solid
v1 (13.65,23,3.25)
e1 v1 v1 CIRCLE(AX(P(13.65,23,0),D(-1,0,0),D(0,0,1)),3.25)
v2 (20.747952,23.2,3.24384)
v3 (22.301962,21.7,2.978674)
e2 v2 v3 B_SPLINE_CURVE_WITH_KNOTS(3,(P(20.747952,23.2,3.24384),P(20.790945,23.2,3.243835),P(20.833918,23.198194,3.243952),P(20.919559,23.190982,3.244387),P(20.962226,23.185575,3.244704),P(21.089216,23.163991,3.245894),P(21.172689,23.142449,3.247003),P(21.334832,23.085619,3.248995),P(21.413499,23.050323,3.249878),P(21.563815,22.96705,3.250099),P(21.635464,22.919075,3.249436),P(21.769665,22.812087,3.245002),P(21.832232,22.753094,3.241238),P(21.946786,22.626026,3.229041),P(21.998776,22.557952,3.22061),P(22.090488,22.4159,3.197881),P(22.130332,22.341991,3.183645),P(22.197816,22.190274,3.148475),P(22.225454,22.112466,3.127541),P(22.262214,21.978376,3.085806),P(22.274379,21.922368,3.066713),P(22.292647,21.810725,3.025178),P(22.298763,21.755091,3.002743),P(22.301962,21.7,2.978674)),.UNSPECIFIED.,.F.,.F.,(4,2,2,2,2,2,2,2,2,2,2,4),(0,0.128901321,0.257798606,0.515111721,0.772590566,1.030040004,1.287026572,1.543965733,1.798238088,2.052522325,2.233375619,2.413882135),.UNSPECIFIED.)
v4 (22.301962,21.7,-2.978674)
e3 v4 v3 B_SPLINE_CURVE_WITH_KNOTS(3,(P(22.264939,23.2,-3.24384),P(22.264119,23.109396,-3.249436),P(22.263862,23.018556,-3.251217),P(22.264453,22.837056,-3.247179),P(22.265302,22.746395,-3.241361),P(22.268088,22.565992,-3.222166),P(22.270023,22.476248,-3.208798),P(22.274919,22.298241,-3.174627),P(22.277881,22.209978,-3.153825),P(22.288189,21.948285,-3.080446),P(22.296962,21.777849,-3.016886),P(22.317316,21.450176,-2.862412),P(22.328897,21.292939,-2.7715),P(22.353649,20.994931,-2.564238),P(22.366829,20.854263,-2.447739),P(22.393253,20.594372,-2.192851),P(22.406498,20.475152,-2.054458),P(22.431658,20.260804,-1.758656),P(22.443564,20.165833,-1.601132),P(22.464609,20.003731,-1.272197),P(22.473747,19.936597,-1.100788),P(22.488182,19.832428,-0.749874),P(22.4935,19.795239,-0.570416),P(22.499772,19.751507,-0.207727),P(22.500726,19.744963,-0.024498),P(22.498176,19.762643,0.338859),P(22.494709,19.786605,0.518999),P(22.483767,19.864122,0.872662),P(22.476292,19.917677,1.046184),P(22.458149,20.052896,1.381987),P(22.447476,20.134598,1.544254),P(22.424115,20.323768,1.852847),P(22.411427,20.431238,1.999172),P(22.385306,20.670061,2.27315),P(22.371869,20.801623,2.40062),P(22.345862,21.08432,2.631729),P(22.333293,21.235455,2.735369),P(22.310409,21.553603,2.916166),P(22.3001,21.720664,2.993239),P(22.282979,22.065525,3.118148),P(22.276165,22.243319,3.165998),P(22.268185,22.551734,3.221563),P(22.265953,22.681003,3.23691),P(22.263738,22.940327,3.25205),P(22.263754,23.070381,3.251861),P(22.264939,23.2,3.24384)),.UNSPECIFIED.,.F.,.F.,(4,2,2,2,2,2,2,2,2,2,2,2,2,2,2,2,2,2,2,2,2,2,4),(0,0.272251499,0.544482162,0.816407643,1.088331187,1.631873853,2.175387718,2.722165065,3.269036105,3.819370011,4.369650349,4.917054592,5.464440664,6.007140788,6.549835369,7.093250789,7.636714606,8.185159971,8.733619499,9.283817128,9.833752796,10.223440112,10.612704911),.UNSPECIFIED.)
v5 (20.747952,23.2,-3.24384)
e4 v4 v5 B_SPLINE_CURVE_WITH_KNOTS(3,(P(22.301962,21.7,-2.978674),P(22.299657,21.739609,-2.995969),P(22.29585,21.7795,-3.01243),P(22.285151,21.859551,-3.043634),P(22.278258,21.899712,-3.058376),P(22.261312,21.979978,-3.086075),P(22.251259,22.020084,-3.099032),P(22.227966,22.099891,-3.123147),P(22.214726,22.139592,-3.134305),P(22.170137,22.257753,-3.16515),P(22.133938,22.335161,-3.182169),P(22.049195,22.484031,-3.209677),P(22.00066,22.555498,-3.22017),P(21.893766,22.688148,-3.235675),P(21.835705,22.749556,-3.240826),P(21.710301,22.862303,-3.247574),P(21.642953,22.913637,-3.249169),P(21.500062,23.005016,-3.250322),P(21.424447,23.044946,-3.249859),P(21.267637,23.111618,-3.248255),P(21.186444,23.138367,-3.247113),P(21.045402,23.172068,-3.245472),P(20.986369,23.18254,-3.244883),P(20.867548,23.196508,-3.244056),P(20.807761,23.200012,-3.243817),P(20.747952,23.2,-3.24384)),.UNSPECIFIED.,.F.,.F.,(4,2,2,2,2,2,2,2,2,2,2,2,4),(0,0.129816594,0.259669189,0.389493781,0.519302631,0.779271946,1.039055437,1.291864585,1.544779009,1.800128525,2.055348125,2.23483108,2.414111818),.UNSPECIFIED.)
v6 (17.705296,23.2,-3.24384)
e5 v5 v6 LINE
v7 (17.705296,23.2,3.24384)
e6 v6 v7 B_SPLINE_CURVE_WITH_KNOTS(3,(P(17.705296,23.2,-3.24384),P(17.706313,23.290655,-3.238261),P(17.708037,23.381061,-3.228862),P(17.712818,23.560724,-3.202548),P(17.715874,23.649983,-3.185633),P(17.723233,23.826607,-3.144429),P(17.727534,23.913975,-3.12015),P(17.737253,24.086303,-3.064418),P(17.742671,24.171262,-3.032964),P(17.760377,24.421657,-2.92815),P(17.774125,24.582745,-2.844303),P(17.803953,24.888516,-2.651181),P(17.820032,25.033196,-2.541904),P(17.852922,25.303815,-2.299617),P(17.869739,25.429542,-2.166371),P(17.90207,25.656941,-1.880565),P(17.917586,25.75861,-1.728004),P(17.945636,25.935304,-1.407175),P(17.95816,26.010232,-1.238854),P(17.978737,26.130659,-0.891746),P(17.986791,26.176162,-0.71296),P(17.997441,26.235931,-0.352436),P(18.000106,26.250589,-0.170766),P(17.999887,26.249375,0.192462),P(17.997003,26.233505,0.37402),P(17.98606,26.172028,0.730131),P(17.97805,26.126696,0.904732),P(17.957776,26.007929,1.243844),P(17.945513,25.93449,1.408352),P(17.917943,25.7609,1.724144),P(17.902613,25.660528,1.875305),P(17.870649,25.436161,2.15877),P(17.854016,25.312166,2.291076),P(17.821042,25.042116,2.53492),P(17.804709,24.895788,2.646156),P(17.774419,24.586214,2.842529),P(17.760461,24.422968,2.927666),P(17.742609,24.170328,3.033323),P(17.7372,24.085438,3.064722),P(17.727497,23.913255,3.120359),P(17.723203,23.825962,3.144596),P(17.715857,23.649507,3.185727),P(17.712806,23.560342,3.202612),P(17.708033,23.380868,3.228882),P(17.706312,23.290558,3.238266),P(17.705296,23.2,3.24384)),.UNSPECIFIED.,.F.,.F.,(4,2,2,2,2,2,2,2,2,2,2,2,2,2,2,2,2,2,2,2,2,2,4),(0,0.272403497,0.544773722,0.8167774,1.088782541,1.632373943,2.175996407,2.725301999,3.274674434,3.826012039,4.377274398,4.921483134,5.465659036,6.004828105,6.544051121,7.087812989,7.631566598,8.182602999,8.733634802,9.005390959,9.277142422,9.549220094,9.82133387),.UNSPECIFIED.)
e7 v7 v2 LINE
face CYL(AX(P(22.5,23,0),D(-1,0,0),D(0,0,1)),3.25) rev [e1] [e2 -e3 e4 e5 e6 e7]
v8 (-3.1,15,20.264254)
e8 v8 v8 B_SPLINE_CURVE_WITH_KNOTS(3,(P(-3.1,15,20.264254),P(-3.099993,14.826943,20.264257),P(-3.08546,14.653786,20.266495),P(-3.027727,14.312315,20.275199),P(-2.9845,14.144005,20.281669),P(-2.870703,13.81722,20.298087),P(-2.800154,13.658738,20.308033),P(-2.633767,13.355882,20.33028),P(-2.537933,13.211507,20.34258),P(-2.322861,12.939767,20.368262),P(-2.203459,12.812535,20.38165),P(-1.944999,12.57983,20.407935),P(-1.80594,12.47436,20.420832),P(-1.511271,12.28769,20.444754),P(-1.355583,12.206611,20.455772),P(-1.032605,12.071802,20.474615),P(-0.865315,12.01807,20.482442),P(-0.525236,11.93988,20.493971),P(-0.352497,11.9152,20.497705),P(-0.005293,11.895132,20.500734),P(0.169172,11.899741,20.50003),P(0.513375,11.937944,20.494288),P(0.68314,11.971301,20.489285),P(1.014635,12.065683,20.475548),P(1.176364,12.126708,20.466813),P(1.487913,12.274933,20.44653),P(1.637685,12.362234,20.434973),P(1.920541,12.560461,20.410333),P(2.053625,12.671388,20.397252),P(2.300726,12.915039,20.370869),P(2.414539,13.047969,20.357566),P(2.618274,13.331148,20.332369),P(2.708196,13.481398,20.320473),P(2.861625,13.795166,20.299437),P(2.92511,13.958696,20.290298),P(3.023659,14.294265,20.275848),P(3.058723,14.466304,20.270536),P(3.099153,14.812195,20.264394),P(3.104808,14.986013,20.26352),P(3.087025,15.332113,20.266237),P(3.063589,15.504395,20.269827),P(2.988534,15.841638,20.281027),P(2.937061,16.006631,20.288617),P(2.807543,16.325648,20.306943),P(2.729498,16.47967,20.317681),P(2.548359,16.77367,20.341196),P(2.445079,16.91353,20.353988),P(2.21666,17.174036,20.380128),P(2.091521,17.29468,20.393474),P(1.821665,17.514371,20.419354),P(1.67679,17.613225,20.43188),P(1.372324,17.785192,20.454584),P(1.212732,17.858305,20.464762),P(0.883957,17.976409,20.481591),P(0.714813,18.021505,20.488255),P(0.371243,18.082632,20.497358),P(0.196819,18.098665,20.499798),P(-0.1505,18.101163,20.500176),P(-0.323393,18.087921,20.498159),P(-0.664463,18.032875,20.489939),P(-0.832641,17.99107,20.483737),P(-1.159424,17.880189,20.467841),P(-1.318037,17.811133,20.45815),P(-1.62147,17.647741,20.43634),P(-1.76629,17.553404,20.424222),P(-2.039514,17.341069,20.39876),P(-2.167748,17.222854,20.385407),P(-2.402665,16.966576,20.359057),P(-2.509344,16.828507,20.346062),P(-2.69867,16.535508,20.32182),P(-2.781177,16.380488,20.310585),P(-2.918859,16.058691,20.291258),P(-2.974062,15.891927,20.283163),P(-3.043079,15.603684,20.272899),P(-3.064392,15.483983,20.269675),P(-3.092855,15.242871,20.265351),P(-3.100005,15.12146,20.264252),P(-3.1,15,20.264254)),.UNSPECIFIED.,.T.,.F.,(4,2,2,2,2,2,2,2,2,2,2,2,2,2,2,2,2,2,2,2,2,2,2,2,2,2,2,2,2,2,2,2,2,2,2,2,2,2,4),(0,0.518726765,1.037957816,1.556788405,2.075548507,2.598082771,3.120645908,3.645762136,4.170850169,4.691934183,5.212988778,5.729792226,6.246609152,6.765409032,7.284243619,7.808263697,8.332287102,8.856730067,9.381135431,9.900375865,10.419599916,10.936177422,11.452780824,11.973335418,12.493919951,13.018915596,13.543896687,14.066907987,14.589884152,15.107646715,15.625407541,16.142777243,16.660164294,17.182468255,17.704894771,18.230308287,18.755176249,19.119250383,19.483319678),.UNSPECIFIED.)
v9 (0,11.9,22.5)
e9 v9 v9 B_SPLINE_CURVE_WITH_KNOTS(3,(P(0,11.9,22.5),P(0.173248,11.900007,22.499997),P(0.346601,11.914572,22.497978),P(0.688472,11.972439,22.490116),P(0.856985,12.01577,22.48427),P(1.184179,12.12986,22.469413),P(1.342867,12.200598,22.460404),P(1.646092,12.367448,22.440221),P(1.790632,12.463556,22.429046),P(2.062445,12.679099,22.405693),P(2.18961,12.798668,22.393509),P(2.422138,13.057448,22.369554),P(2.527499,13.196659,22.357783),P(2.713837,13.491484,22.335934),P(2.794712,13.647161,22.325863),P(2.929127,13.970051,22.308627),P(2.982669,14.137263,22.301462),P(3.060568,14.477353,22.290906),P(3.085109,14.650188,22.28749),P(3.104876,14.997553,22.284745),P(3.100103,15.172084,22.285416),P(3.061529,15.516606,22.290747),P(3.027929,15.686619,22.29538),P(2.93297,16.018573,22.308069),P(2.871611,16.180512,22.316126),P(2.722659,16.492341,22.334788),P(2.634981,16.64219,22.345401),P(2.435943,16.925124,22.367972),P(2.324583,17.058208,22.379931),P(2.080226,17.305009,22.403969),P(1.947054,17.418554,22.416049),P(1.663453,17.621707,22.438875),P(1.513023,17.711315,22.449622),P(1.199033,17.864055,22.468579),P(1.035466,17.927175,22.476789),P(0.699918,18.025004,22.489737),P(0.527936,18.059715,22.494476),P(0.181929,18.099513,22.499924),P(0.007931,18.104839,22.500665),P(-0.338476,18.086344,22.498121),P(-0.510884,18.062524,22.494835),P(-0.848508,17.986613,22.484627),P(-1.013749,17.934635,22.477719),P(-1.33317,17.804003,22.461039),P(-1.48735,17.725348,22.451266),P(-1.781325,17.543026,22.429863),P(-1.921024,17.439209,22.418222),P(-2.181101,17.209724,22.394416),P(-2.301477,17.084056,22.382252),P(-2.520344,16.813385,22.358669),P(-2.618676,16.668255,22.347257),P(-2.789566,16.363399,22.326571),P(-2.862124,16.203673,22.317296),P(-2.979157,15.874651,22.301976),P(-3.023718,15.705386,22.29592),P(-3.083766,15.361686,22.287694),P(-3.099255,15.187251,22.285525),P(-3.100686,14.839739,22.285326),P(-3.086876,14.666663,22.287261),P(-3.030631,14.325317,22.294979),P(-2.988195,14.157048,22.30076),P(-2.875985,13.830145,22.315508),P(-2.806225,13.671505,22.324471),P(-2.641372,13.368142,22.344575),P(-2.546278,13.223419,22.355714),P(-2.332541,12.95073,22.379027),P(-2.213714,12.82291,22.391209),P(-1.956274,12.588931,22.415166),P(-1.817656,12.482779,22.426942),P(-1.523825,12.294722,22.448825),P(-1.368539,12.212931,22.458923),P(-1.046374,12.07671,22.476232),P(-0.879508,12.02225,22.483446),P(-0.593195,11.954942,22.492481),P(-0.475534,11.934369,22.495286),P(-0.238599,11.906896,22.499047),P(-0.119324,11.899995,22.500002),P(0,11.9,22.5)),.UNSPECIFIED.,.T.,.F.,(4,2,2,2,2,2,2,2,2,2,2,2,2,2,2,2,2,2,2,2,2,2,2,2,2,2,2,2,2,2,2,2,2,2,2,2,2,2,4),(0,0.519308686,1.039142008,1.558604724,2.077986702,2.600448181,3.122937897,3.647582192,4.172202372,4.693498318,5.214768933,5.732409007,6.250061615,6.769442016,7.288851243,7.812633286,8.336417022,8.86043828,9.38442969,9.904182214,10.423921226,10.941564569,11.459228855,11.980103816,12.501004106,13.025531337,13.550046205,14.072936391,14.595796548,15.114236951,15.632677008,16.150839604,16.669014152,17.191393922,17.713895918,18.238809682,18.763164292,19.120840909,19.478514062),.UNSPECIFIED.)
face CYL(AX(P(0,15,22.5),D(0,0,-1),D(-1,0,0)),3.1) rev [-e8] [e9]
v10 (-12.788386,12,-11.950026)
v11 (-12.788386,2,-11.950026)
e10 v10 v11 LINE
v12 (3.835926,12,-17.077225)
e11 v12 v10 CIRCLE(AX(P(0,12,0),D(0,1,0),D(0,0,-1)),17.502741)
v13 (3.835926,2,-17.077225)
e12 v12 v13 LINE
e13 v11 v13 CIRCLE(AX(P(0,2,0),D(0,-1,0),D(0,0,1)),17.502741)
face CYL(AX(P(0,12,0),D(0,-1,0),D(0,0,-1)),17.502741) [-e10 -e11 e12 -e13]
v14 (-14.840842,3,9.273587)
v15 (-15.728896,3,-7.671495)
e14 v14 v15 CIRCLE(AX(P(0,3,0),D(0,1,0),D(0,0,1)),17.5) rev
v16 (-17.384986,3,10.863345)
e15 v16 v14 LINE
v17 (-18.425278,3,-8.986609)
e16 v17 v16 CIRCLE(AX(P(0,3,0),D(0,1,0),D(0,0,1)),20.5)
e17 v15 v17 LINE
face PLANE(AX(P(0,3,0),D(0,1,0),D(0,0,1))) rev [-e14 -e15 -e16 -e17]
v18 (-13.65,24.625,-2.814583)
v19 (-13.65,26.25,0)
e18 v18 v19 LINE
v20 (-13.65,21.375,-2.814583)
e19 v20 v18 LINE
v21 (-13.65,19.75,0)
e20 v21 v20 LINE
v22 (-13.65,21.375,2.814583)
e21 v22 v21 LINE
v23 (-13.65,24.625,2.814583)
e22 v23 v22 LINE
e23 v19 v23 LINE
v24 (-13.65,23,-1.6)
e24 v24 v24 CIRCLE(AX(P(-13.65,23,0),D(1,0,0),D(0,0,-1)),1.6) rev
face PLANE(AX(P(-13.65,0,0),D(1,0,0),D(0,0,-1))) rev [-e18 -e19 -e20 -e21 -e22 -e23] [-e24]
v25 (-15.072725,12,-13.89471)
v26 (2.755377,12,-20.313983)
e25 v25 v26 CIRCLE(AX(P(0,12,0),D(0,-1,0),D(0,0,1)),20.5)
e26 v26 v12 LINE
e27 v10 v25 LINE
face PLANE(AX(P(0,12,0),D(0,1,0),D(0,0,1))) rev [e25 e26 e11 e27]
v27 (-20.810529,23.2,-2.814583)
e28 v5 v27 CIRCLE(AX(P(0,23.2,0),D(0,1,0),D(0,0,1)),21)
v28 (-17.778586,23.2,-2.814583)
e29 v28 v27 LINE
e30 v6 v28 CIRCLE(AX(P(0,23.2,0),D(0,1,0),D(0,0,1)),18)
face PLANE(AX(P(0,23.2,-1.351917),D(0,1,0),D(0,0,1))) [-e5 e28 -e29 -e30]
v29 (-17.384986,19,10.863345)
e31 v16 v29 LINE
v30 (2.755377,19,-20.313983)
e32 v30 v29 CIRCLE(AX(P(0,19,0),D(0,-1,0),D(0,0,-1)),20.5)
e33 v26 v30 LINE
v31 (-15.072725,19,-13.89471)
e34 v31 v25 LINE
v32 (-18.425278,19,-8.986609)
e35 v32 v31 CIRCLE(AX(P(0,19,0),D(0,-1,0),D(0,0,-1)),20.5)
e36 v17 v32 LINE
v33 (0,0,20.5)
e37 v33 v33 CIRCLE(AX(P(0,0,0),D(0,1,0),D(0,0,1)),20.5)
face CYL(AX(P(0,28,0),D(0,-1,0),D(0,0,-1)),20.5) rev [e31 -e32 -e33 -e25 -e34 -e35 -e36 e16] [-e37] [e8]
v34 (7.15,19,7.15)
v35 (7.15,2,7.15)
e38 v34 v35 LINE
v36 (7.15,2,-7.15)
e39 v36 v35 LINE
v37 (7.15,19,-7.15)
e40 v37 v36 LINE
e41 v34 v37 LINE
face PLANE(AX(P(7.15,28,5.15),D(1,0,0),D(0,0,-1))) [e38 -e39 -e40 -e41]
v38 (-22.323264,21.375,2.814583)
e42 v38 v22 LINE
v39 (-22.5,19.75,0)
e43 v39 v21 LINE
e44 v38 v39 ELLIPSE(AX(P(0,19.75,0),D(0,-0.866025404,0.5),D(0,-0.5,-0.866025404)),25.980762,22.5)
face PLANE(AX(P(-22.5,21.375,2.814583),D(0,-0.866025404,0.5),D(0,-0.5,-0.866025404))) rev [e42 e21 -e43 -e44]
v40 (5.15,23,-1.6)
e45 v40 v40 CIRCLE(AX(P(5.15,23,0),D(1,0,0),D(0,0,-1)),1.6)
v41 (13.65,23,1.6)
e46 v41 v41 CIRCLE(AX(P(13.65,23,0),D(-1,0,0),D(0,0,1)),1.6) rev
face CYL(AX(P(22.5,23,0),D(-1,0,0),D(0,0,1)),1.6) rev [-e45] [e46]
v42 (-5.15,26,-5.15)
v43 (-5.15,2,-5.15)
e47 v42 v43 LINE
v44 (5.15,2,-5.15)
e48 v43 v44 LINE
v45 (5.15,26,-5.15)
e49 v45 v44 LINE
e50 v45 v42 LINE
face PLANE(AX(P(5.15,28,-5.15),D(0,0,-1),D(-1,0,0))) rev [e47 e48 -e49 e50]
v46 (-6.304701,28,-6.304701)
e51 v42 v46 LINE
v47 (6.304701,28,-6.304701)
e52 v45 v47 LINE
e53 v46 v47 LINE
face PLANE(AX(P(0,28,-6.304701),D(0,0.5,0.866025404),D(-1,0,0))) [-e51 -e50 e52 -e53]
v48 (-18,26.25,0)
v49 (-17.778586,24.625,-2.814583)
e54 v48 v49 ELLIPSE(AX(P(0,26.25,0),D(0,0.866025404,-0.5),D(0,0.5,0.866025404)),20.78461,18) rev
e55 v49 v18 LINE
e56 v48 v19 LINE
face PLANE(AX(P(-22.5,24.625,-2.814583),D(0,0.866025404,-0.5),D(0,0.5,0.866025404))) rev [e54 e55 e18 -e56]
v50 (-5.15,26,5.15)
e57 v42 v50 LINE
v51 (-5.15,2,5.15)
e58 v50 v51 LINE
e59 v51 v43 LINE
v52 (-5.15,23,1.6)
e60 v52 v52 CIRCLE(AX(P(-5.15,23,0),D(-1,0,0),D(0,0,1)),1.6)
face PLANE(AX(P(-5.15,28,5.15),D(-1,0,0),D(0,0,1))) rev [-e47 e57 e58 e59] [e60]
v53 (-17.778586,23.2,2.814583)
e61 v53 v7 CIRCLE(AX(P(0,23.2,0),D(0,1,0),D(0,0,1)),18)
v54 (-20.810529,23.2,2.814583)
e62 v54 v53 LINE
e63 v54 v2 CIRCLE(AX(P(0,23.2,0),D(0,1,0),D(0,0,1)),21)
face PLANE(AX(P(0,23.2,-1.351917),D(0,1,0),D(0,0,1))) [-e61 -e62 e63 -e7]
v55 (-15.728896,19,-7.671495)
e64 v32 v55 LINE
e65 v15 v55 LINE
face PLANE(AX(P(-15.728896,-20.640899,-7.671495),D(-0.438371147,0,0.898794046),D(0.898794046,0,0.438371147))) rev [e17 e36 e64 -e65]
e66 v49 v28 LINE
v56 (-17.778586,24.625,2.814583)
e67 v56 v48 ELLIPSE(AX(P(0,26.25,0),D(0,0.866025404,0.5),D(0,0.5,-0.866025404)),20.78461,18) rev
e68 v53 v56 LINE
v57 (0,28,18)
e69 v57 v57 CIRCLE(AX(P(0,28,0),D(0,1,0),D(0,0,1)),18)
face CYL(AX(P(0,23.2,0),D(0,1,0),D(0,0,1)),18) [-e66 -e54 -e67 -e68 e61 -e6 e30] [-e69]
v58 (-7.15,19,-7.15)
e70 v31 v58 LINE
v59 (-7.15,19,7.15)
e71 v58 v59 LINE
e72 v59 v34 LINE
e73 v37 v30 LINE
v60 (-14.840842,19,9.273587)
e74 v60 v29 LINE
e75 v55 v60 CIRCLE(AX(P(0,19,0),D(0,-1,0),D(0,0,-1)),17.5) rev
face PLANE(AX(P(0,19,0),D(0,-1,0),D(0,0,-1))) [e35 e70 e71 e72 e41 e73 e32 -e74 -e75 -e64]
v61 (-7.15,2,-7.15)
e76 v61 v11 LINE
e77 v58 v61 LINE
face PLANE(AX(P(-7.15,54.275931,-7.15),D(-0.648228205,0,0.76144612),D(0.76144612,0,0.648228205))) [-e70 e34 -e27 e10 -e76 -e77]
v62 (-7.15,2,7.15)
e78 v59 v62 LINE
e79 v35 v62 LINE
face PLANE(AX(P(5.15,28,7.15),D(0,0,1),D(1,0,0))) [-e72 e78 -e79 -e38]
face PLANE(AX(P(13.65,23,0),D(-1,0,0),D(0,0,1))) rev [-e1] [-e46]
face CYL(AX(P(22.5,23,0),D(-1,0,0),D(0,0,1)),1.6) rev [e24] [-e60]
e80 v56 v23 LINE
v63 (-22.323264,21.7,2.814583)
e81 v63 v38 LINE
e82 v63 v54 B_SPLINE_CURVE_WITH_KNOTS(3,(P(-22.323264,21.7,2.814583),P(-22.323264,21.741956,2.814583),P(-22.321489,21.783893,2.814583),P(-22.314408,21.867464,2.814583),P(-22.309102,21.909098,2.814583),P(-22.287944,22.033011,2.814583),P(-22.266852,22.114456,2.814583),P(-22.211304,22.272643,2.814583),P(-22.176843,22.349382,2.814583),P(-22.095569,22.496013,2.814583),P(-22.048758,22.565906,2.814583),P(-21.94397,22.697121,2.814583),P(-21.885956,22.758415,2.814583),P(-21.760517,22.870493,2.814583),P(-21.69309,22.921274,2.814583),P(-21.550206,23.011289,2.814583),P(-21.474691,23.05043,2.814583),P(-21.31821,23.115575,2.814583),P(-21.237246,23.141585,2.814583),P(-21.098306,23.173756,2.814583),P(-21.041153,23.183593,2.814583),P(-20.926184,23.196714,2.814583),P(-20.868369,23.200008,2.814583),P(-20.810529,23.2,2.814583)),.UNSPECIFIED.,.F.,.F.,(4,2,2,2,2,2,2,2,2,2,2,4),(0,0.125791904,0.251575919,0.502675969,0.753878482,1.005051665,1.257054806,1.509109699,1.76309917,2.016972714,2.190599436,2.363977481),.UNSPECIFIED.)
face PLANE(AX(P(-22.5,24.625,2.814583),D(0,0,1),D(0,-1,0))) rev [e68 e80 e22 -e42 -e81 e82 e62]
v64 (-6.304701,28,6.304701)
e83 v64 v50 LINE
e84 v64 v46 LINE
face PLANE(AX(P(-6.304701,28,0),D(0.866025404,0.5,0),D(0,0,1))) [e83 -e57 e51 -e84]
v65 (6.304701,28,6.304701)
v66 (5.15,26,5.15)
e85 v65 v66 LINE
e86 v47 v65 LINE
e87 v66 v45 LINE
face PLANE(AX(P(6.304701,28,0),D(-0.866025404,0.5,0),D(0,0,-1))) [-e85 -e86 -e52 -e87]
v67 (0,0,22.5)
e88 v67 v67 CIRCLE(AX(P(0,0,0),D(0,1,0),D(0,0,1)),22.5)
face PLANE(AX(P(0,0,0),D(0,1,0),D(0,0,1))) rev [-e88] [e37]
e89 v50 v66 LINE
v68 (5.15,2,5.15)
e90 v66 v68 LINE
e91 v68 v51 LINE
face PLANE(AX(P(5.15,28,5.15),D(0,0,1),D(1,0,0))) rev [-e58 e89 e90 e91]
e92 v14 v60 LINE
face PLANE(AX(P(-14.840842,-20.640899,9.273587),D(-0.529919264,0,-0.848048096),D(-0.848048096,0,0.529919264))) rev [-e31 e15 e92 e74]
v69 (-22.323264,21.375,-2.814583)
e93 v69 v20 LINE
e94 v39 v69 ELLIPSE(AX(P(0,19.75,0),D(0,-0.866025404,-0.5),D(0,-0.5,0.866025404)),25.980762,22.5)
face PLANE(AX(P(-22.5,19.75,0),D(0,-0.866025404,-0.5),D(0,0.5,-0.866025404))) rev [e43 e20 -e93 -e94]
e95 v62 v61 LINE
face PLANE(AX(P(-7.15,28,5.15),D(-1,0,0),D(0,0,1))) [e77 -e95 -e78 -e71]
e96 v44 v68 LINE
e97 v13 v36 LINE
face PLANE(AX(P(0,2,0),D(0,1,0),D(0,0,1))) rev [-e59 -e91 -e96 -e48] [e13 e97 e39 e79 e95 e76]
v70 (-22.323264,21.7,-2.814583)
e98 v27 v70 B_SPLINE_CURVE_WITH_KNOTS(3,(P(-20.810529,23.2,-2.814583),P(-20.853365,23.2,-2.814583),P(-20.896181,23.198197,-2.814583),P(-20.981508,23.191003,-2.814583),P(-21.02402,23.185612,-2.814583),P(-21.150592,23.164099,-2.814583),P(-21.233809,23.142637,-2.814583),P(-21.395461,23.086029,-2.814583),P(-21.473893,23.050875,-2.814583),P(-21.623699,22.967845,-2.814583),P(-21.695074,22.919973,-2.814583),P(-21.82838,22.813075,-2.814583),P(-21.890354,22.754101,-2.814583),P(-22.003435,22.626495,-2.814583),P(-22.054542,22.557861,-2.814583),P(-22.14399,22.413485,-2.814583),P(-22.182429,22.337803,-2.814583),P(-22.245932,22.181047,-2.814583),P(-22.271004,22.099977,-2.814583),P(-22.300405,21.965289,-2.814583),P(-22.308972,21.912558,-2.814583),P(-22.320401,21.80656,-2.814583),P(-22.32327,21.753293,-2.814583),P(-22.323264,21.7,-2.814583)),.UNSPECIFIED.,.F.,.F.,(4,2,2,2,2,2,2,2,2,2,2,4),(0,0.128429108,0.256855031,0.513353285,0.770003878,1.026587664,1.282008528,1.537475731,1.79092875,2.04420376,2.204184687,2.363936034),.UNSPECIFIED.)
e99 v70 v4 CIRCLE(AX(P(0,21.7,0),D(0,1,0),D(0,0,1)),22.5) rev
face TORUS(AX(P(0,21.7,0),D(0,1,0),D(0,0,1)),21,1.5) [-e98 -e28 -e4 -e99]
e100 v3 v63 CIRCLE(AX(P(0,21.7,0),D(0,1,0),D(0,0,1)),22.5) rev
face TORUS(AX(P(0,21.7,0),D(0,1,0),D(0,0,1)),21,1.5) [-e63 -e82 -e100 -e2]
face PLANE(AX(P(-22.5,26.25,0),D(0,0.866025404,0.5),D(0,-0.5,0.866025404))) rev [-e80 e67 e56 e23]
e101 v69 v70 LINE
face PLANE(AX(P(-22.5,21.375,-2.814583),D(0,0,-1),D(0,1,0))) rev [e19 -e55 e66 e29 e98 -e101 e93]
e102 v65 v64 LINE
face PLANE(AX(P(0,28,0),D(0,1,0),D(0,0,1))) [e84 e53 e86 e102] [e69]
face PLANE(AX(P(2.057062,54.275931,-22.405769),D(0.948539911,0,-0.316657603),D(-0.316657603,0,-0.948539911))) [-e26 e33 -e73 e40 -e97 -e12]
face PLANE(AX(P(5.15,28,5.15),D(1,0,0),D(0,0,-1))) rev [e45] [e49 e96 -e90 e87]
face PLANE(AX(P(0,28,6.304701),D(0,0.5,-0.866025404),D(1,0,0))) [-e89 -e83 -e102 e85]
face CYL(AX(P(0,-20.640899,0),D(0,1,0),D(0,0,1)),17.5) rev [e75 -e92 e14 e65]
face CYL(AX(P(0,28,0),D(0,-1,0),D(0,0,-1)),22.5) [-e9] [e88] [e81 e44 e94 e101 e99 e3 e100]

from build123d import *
from OCP.BRepFilletAPI import BRepFilletAPI_MakeChamfer

# Parameters (mm, degrees)
SKETCH1_R                = 22.5
BOSS_EXTRUDE1_DEPTH      = 28
SKETCH2_W                = 10.3
SKETCH2_H                = 10.3
CUT_EXTRUDE2_DEPTH       = 43.385138905
SHELL3_T                 = -2
SKETCH3_R                = 3.1
CUT_EXTRUDE3_DEPTH       = 47.576523056
CHAMFER1_SIZE            = 2
CHAMFER1_SIZE2           = 1.154700538
BOSS_EXTRUDE8_START      = 23
BOSS_EXTRUDE8_DEPTH      = 23
BOSS_EXTRUDE4_DEPTH      = 20
BOSS_EXTRUDE6_DEPTH      = 26
CUT_EXTRUDE5_DEPTH       = 12
CUT_EXTRUDE9_DEPTH       = 2
BOSS_EXTRUDE10_START     = 7
BOSS_EXTRUDE10_DEPTH     = 7
SKETCH21_OUTSIDE_W       = 61.262
SKETCH21_OUTSIDE_H       = 63.966
SKETCH21_OUTSIDE_R       = 18
CUT_EXTRUDE11_DEPTH      = 4.8
CUT_EXTRUDE12_DEPTH      = 47.730672242
CUT_EXTRUDE12_DEPTH_BACK = 47.730672242
SKETCH22_R               = 1.6
CUT_EXTRUDE13_START      = -8.5
SKETCH24_R               = 3.25
CUT_EXTRUDE13_DEPTH      = 39.230672302
CUT_EXTRUDE14_START      = -8.5
CUT_EXTRUDE14_DEPTH      = 39.230672304
FILLET1_R                = 1.5
SKETCH26_R               = 43.919943133
SKETCH26_R_2             = 22.5
CUT_EXTRUDE15_DEPTH      = 44.880328541


with BuildPart() as part:
    # Sketch1 → Boss-Extrude1 (new body)
    with BuildSketch(Plane(origin=(0, 0, 0), x_dir=(1, 0, 0), z_dir=(0, 1, 0))):
        with Locations(Location((0, 0, 0), (0, 0, 270))):
            Circle(SKETCH1_R)
    extrude(amount=BOSS_EXTRUDE1_DEPTH)

    # Sketch2 → Cut-Extrude2 (cut, through all)
    with BuildSketch(Plane.XZ):
        Rectangle(SKETCH2_W, SKETCH2_H)
    extrude(amount=-CUT_EXTRUDE2_DEPTH, mode=Mode.SUBTRACT)

    # Shell3
    shell3_openings = [part.faces().sort_by_distance(p)[0] for p in [
        (0, 0, -21.863603897),
    ]]
    offset(amount=SHELL3_T, openings=shell3_openings, kind=Kind.INTERSECTION)

    # Sketch3 → Cut-Extrude3 (cut, through all)
    with BuildSketch(Plane.XY.offset(7.15)):
        with Locations(Location((0, 15, 0), (0, 0, 270.000000016))):
            Circle(SKETCH3_R)
    extrude(amount=CUT_EXTRUDE3_DEPTH, mode=Mode.SUBTRACT)

    # Chamfer1: one chamfer whose edges measure the first distance from different faces: ONE call of the kernel's chamfer builder (chamfer() names one face for all edges)
    chamfer1_edges_1 = [part.edges().sort_by_distance(p)[0] for p in [
        (5.15, 28, 0),
    ]]
    chamfer1_side_1 = [part.faces().sort_by_distance(p)[0] for p in [
        (5.15, 14, 0),
    ]]
    chamfer1_edges_2 = [part.edges().sort_by_distance(p)[0] for p in [
        (0, 28, -5.15),
    ]]
    chamfer1_side_2 = [part.faces().sort_by_distance(p)[0] for p in [
        (0, 14, -5.15),
    ]]
    chamfer1_edges_3 = [part.edges().sort_by_distance(p)[0] for p in [
        (-5.15, 28, 0),
    ]]
    chamfer1_side_3 = [part.faces().sort_by_distance(p)[0] for p in [
        (-5.15, 14, 0),
    ]]
    chamfer1_edges_4 = [part.edges().sort_by_distance(p)[0] for p in [
        (0, 28, 5.15),
    ]]
    chamfer1_side_4 = [part.faces().sort_by_distance(p)[0] for p in [
        (0, 14, 5.15),
    ]]
    chamfer1 = BRepFilletAPI_MakeChamfer(part.part.solid().wrapped)
    for e in chamfer1_edges_1:
        chamfer1.Add(CHAMFER1_SIZE, CHAMFER1_SIZE2, e.wrapped, chamfer1_side_1[0].wrapped)  # the first distance lies on this face
    for e in chamfer1_edges_2:
        chamfer1.Add(CHAMFER1_SIZE, CHAMFER1_SIZE2, e.wrapped, chamfer1_side_2[0].wrapped)  # the first distance lies on this face
    for e in chamfer1_edges_3:
        chamfer1.Add(CHAMFER1_SIZE, CHAMFER1_SIZE2, e.wrapped, chamfer1_side_3[0].wrapped)  # the first distance lies on this face
    for e in chamfer1_edges_4:
        chamfer1.Add(CHAMFER1_SIZE, CHAMFER1_SIZE2, e.wrapped, chamfer1_side_4[0].wrapped)  # the first distance lies on this face
    add(Compound.cast(chamfer1.Shape()), mode=Mode.REPLACE)

    # Sketch18 → Boss-Extrude8 (add)
    with BuildSketch(Plane.XZ.offset(-26).offset(BOSS_EXTRUDE8_START)):
        with BuildLine():
            Line((-15.72889581, -7.671495069), (-18.425277949, -8.986608509))
            ThreePointArc((-18.425277949, -8.986608509), (-20.471905462, 1.072887103), (-17.384985971, 10.863344917))
            Line((-17.384985971, 10.863344917), (-14.840841683, 9.273587124))
            ThreePointArc((-14.840841683, 9.273587124), (-17.476016858, 0.915879234), (-15.72889581, -7.671495069))
        make_face()
    extrude(amount=-BOSS_EXTRUDE8_DEPTH)

    # Sketch9 → Boss-Extrude4 (add)
    with BuildSketch(Plane.XZ):
        Polygon((2.057061598, -22.405769292), (-16.596699733, -15.192088664), (-17.678751827, -17.990152864), (0.975009504, -25.203833492), align=None)
    extrude(amount=-BOSS_EXTRUDE4_DEPTH)

    # Sketch11 → Boss-Extrude6 (add)
    with BuildSketch(Plane.XZ):
        with BuildLine():
            Line((2.057061598, -22.405769292), (7.15, -7.15))
            Line((7.15, -7.15), (-7.15, -7.15))
            Line((-7.15, -7.15), (-16.596699733, -15.192088664))
            ThreePointArc((-16.596699733, -15.192088664), (-8.115390707, -20.985481497), (2.057061598, -22.405769292))
        make_face()
    extrude(amount=-BOSS_EXTRUDE6_DEPTH)

    # Sketch12 → Cut-Extrude5 (cut)
    with BuildSketch(Plane.XZ):
        with BuildLine():
            Line((3.835926277, -17.077224747), (2.755377072, -20.3139828))
            ThreePointArc((2.755377072, -20.3139828), (-6.94485615, -19.287793369), (-15.072724539, -13.894710323))
            Line((-15.072724539, -13.894710323), (-12.788386178, -11.950025708))
            ThreePointArc((-12.788386178, -11.950025708), (-5.15835992, -16.725347781), (3.835926277, -17.077224747))
        make_face()
    extrude(amount=-CUT_EXTRUDE5_DEPTH, mode=Mode.SUBTRACT)

    # Sketch17 → Cut-Extrude9 (cut)
    with BuildSketch(Plane.XZ):
        with BuildLine():
            Line((7.15, 7.15), (7.15, -7.15))
            Line((7.15, -7.15), (3.835926277, -17.077224747))
            ThreePointArc((3.835926277, -17.077224747), (-5.15835992, -16.725347781), (-12.788386178, -11.950025708))
            Line((-12.788386178, -11.950025708), (-7.15, -7.15))
            Line((-7.15, -7.15), (-7.15, 7.15))
            Line((-7.15, 7.15), (7.15, 7.15))
        make_face()
    extrude(amount=-CUT_EXTRUDE9_DEPTH, mode=Mode.SUBTRACT)

    # Sketch20 → Boss-Extrude10 (add)
    with BuildSketch(Plane.XZ.offset(-26).offset(BOSS_EXTRUDE10_START)):
        with BuildLine():
            Line((2.755377072, -20.3139828), (7.15, -7.15))
            Line((7.15, -7.15), (7.15, 7.15))
            Line((7.15, 7.15), (-7.15, 7.15))
            Line((-7.15, 7.15), (-7.15, -7.15))
            Line((-7.15, -7.15), (-15.072724539, -13.894710323))
            ThreePointArc((-15.072724539, -13.894710323), (6.94485615, 19.287793369), (2.755377072, -20.3139828))
        make_face()
    extrude(amount=-BOSS_EXTRUDE10_DEPTH)

    # Sketch21 outside → Cut-Extrude11 (cut)
    with BuildSketch(Plane(origin=(0, 28, 0), x_dir=(1, 0, 0), z_dir=(0, 1, 0))):
        with Locations((0, 1.352)):
            Rectangle(SKETCH21_OUTSIDE_W, SKETCH21_OUTSIDE_H)
        with Locations(Location((0, 0, 0), (0, 0, 270))):
            Circle(SKETCH21_OUTSIDE_R, mode=Mode.SUBTRACT)
    extrude(amount=-CUT_EXTRUDE11_DEPTH, mode=Mode.SUBTRACT)

    # Sketch22 → Cut-Extrude12 (cut, two sides: drawn at the far end of the back side and taken through both)
    with BuildSketch(Plane.ZY.offset(-5.15).offset(-CUT_EXTRUDE12_DEPTH_BACK)):
        with Locations((0, 23)):
            Circle(SKETCH22_R)
    extrude(amount=CUT_EXTRUDE12_DEPTH + CUT_EXTRUDE12_DEPTH_BACK, mode=Mode.SUBTRACT)

    # Sketch24 → Cut-Extrude13 (cut, through all)
    with BuildSketch(Plane.ZY.offset(-5.15).offset(CUT_EXTRUDE13_START)):
        with Locations((0, 23)):
            Circle(SKETCH24_R)
    extrude(amount=-CUT_EXTRUDE13_DEPTH, mode=Mode.SUBTRACT)

    # Sketch25 → Cut-Extrude14 (cut, through all)
    with BuildSketch(Plane(origin=(-5.15, 0, 0), x_dir=(0, 0, -1), z_dir=(1, 0, 0)).offset(CUT_EXTRUDE14_START)):
        Polygon((0, 19.75), (2.814582562, 21.375), (2.814582562, 24.625), (0, 26.25), (-2.814582562, 24.625), (-2.814582562, 21.375), align=None)
    extrude(amount=-CUT_EXTRUDE14_DEPTH, mode=Mode.SUBTRACT)

    # Fillet1
    # the kernel refuses this fillet: 1.5 mm, written as the material it takes off along each edge
    with BuildSketch(Plane(origin=(0, 23.2, 0), x_dir=(0, 0, 1), z_dir=(1, 0, 0))) as fillet1_piece_1:
        with BuildLine():
            CenterArc((22.5 - FILLET1_R, FILLET1_R), FILLET1_R, 270, 90)
            Line((22.5, FILLET1_R), (22.5, 0))
            Line((22.5, 0), (22.5 - FILLET1_R, 0))
        make_face()
    revolve(axis=Axis((0, 23.2, 0), (0, -1, 0)), revolution_arc=92.366443414, mode=Mode.SUBTRACT)
    with BuildSketch(Plane(origin=(0, 23.2, 0), x_dir=(-0.9991402664664062, 0, 0.041457543649361384), z_dir=(0.041457543649361384, 0, 0.9991402664664062))) as fillet1_piece_2:
        with BuildLine():
            CenterArc((22.5 - FILLET1_R, FILLET1_R), FILLET1_R, 270, 90)
            Line((22.5, FILLET1_R), (22.5, 0))
            Line((22.5, 0), (22.5 - FILLET1_R, 0))
        make_face()
    revolve(axis=Axis((0, 23.2, 0), (0, -1, 0)), revolution_arc=183.648889302, mode=Mode.SUBTRACT)
    with BuildSketch(Plane(origin=(0, 23.2, 0), x_dir=(0.9997569746526436, 0, -0.022045217925738058), z_dir=(-0.022045217925738058, 0, -0.9997569746526436))) as fillet1_piece_3:
        with BuildLine():
            CenterArc((22.5 - FILLET1_R, FILLET1_R), FILLET1_R, 270, 90)
            Line((22.5, FILLET1_R), (22.5, 0))
            Line((22.5, 0), (22.5 - FILLET1_R, 0))
        make_face()
    revolve(axis=Axis((0, 23.2, 0), (0, -1, 0)), revolution_arc=91.263200277, mode=Mode.SUBTRACT)

    # Sketch26 → Cut-Extrude15 (cut, through all)
    with BuildSketch(Plane.XZ):
        Circle(SKETCH26_R)
        with Locations(Location((0, 0, 0), (0, 0, 352.392535773))):
            Circle(SKETCH26_R_2, mode=Mode.SUBTRACT)
    extrude(amount=-CUT_EXTRUDE15_DEPTH, mode=Mode.SUBTRACT)


solid = part.part
